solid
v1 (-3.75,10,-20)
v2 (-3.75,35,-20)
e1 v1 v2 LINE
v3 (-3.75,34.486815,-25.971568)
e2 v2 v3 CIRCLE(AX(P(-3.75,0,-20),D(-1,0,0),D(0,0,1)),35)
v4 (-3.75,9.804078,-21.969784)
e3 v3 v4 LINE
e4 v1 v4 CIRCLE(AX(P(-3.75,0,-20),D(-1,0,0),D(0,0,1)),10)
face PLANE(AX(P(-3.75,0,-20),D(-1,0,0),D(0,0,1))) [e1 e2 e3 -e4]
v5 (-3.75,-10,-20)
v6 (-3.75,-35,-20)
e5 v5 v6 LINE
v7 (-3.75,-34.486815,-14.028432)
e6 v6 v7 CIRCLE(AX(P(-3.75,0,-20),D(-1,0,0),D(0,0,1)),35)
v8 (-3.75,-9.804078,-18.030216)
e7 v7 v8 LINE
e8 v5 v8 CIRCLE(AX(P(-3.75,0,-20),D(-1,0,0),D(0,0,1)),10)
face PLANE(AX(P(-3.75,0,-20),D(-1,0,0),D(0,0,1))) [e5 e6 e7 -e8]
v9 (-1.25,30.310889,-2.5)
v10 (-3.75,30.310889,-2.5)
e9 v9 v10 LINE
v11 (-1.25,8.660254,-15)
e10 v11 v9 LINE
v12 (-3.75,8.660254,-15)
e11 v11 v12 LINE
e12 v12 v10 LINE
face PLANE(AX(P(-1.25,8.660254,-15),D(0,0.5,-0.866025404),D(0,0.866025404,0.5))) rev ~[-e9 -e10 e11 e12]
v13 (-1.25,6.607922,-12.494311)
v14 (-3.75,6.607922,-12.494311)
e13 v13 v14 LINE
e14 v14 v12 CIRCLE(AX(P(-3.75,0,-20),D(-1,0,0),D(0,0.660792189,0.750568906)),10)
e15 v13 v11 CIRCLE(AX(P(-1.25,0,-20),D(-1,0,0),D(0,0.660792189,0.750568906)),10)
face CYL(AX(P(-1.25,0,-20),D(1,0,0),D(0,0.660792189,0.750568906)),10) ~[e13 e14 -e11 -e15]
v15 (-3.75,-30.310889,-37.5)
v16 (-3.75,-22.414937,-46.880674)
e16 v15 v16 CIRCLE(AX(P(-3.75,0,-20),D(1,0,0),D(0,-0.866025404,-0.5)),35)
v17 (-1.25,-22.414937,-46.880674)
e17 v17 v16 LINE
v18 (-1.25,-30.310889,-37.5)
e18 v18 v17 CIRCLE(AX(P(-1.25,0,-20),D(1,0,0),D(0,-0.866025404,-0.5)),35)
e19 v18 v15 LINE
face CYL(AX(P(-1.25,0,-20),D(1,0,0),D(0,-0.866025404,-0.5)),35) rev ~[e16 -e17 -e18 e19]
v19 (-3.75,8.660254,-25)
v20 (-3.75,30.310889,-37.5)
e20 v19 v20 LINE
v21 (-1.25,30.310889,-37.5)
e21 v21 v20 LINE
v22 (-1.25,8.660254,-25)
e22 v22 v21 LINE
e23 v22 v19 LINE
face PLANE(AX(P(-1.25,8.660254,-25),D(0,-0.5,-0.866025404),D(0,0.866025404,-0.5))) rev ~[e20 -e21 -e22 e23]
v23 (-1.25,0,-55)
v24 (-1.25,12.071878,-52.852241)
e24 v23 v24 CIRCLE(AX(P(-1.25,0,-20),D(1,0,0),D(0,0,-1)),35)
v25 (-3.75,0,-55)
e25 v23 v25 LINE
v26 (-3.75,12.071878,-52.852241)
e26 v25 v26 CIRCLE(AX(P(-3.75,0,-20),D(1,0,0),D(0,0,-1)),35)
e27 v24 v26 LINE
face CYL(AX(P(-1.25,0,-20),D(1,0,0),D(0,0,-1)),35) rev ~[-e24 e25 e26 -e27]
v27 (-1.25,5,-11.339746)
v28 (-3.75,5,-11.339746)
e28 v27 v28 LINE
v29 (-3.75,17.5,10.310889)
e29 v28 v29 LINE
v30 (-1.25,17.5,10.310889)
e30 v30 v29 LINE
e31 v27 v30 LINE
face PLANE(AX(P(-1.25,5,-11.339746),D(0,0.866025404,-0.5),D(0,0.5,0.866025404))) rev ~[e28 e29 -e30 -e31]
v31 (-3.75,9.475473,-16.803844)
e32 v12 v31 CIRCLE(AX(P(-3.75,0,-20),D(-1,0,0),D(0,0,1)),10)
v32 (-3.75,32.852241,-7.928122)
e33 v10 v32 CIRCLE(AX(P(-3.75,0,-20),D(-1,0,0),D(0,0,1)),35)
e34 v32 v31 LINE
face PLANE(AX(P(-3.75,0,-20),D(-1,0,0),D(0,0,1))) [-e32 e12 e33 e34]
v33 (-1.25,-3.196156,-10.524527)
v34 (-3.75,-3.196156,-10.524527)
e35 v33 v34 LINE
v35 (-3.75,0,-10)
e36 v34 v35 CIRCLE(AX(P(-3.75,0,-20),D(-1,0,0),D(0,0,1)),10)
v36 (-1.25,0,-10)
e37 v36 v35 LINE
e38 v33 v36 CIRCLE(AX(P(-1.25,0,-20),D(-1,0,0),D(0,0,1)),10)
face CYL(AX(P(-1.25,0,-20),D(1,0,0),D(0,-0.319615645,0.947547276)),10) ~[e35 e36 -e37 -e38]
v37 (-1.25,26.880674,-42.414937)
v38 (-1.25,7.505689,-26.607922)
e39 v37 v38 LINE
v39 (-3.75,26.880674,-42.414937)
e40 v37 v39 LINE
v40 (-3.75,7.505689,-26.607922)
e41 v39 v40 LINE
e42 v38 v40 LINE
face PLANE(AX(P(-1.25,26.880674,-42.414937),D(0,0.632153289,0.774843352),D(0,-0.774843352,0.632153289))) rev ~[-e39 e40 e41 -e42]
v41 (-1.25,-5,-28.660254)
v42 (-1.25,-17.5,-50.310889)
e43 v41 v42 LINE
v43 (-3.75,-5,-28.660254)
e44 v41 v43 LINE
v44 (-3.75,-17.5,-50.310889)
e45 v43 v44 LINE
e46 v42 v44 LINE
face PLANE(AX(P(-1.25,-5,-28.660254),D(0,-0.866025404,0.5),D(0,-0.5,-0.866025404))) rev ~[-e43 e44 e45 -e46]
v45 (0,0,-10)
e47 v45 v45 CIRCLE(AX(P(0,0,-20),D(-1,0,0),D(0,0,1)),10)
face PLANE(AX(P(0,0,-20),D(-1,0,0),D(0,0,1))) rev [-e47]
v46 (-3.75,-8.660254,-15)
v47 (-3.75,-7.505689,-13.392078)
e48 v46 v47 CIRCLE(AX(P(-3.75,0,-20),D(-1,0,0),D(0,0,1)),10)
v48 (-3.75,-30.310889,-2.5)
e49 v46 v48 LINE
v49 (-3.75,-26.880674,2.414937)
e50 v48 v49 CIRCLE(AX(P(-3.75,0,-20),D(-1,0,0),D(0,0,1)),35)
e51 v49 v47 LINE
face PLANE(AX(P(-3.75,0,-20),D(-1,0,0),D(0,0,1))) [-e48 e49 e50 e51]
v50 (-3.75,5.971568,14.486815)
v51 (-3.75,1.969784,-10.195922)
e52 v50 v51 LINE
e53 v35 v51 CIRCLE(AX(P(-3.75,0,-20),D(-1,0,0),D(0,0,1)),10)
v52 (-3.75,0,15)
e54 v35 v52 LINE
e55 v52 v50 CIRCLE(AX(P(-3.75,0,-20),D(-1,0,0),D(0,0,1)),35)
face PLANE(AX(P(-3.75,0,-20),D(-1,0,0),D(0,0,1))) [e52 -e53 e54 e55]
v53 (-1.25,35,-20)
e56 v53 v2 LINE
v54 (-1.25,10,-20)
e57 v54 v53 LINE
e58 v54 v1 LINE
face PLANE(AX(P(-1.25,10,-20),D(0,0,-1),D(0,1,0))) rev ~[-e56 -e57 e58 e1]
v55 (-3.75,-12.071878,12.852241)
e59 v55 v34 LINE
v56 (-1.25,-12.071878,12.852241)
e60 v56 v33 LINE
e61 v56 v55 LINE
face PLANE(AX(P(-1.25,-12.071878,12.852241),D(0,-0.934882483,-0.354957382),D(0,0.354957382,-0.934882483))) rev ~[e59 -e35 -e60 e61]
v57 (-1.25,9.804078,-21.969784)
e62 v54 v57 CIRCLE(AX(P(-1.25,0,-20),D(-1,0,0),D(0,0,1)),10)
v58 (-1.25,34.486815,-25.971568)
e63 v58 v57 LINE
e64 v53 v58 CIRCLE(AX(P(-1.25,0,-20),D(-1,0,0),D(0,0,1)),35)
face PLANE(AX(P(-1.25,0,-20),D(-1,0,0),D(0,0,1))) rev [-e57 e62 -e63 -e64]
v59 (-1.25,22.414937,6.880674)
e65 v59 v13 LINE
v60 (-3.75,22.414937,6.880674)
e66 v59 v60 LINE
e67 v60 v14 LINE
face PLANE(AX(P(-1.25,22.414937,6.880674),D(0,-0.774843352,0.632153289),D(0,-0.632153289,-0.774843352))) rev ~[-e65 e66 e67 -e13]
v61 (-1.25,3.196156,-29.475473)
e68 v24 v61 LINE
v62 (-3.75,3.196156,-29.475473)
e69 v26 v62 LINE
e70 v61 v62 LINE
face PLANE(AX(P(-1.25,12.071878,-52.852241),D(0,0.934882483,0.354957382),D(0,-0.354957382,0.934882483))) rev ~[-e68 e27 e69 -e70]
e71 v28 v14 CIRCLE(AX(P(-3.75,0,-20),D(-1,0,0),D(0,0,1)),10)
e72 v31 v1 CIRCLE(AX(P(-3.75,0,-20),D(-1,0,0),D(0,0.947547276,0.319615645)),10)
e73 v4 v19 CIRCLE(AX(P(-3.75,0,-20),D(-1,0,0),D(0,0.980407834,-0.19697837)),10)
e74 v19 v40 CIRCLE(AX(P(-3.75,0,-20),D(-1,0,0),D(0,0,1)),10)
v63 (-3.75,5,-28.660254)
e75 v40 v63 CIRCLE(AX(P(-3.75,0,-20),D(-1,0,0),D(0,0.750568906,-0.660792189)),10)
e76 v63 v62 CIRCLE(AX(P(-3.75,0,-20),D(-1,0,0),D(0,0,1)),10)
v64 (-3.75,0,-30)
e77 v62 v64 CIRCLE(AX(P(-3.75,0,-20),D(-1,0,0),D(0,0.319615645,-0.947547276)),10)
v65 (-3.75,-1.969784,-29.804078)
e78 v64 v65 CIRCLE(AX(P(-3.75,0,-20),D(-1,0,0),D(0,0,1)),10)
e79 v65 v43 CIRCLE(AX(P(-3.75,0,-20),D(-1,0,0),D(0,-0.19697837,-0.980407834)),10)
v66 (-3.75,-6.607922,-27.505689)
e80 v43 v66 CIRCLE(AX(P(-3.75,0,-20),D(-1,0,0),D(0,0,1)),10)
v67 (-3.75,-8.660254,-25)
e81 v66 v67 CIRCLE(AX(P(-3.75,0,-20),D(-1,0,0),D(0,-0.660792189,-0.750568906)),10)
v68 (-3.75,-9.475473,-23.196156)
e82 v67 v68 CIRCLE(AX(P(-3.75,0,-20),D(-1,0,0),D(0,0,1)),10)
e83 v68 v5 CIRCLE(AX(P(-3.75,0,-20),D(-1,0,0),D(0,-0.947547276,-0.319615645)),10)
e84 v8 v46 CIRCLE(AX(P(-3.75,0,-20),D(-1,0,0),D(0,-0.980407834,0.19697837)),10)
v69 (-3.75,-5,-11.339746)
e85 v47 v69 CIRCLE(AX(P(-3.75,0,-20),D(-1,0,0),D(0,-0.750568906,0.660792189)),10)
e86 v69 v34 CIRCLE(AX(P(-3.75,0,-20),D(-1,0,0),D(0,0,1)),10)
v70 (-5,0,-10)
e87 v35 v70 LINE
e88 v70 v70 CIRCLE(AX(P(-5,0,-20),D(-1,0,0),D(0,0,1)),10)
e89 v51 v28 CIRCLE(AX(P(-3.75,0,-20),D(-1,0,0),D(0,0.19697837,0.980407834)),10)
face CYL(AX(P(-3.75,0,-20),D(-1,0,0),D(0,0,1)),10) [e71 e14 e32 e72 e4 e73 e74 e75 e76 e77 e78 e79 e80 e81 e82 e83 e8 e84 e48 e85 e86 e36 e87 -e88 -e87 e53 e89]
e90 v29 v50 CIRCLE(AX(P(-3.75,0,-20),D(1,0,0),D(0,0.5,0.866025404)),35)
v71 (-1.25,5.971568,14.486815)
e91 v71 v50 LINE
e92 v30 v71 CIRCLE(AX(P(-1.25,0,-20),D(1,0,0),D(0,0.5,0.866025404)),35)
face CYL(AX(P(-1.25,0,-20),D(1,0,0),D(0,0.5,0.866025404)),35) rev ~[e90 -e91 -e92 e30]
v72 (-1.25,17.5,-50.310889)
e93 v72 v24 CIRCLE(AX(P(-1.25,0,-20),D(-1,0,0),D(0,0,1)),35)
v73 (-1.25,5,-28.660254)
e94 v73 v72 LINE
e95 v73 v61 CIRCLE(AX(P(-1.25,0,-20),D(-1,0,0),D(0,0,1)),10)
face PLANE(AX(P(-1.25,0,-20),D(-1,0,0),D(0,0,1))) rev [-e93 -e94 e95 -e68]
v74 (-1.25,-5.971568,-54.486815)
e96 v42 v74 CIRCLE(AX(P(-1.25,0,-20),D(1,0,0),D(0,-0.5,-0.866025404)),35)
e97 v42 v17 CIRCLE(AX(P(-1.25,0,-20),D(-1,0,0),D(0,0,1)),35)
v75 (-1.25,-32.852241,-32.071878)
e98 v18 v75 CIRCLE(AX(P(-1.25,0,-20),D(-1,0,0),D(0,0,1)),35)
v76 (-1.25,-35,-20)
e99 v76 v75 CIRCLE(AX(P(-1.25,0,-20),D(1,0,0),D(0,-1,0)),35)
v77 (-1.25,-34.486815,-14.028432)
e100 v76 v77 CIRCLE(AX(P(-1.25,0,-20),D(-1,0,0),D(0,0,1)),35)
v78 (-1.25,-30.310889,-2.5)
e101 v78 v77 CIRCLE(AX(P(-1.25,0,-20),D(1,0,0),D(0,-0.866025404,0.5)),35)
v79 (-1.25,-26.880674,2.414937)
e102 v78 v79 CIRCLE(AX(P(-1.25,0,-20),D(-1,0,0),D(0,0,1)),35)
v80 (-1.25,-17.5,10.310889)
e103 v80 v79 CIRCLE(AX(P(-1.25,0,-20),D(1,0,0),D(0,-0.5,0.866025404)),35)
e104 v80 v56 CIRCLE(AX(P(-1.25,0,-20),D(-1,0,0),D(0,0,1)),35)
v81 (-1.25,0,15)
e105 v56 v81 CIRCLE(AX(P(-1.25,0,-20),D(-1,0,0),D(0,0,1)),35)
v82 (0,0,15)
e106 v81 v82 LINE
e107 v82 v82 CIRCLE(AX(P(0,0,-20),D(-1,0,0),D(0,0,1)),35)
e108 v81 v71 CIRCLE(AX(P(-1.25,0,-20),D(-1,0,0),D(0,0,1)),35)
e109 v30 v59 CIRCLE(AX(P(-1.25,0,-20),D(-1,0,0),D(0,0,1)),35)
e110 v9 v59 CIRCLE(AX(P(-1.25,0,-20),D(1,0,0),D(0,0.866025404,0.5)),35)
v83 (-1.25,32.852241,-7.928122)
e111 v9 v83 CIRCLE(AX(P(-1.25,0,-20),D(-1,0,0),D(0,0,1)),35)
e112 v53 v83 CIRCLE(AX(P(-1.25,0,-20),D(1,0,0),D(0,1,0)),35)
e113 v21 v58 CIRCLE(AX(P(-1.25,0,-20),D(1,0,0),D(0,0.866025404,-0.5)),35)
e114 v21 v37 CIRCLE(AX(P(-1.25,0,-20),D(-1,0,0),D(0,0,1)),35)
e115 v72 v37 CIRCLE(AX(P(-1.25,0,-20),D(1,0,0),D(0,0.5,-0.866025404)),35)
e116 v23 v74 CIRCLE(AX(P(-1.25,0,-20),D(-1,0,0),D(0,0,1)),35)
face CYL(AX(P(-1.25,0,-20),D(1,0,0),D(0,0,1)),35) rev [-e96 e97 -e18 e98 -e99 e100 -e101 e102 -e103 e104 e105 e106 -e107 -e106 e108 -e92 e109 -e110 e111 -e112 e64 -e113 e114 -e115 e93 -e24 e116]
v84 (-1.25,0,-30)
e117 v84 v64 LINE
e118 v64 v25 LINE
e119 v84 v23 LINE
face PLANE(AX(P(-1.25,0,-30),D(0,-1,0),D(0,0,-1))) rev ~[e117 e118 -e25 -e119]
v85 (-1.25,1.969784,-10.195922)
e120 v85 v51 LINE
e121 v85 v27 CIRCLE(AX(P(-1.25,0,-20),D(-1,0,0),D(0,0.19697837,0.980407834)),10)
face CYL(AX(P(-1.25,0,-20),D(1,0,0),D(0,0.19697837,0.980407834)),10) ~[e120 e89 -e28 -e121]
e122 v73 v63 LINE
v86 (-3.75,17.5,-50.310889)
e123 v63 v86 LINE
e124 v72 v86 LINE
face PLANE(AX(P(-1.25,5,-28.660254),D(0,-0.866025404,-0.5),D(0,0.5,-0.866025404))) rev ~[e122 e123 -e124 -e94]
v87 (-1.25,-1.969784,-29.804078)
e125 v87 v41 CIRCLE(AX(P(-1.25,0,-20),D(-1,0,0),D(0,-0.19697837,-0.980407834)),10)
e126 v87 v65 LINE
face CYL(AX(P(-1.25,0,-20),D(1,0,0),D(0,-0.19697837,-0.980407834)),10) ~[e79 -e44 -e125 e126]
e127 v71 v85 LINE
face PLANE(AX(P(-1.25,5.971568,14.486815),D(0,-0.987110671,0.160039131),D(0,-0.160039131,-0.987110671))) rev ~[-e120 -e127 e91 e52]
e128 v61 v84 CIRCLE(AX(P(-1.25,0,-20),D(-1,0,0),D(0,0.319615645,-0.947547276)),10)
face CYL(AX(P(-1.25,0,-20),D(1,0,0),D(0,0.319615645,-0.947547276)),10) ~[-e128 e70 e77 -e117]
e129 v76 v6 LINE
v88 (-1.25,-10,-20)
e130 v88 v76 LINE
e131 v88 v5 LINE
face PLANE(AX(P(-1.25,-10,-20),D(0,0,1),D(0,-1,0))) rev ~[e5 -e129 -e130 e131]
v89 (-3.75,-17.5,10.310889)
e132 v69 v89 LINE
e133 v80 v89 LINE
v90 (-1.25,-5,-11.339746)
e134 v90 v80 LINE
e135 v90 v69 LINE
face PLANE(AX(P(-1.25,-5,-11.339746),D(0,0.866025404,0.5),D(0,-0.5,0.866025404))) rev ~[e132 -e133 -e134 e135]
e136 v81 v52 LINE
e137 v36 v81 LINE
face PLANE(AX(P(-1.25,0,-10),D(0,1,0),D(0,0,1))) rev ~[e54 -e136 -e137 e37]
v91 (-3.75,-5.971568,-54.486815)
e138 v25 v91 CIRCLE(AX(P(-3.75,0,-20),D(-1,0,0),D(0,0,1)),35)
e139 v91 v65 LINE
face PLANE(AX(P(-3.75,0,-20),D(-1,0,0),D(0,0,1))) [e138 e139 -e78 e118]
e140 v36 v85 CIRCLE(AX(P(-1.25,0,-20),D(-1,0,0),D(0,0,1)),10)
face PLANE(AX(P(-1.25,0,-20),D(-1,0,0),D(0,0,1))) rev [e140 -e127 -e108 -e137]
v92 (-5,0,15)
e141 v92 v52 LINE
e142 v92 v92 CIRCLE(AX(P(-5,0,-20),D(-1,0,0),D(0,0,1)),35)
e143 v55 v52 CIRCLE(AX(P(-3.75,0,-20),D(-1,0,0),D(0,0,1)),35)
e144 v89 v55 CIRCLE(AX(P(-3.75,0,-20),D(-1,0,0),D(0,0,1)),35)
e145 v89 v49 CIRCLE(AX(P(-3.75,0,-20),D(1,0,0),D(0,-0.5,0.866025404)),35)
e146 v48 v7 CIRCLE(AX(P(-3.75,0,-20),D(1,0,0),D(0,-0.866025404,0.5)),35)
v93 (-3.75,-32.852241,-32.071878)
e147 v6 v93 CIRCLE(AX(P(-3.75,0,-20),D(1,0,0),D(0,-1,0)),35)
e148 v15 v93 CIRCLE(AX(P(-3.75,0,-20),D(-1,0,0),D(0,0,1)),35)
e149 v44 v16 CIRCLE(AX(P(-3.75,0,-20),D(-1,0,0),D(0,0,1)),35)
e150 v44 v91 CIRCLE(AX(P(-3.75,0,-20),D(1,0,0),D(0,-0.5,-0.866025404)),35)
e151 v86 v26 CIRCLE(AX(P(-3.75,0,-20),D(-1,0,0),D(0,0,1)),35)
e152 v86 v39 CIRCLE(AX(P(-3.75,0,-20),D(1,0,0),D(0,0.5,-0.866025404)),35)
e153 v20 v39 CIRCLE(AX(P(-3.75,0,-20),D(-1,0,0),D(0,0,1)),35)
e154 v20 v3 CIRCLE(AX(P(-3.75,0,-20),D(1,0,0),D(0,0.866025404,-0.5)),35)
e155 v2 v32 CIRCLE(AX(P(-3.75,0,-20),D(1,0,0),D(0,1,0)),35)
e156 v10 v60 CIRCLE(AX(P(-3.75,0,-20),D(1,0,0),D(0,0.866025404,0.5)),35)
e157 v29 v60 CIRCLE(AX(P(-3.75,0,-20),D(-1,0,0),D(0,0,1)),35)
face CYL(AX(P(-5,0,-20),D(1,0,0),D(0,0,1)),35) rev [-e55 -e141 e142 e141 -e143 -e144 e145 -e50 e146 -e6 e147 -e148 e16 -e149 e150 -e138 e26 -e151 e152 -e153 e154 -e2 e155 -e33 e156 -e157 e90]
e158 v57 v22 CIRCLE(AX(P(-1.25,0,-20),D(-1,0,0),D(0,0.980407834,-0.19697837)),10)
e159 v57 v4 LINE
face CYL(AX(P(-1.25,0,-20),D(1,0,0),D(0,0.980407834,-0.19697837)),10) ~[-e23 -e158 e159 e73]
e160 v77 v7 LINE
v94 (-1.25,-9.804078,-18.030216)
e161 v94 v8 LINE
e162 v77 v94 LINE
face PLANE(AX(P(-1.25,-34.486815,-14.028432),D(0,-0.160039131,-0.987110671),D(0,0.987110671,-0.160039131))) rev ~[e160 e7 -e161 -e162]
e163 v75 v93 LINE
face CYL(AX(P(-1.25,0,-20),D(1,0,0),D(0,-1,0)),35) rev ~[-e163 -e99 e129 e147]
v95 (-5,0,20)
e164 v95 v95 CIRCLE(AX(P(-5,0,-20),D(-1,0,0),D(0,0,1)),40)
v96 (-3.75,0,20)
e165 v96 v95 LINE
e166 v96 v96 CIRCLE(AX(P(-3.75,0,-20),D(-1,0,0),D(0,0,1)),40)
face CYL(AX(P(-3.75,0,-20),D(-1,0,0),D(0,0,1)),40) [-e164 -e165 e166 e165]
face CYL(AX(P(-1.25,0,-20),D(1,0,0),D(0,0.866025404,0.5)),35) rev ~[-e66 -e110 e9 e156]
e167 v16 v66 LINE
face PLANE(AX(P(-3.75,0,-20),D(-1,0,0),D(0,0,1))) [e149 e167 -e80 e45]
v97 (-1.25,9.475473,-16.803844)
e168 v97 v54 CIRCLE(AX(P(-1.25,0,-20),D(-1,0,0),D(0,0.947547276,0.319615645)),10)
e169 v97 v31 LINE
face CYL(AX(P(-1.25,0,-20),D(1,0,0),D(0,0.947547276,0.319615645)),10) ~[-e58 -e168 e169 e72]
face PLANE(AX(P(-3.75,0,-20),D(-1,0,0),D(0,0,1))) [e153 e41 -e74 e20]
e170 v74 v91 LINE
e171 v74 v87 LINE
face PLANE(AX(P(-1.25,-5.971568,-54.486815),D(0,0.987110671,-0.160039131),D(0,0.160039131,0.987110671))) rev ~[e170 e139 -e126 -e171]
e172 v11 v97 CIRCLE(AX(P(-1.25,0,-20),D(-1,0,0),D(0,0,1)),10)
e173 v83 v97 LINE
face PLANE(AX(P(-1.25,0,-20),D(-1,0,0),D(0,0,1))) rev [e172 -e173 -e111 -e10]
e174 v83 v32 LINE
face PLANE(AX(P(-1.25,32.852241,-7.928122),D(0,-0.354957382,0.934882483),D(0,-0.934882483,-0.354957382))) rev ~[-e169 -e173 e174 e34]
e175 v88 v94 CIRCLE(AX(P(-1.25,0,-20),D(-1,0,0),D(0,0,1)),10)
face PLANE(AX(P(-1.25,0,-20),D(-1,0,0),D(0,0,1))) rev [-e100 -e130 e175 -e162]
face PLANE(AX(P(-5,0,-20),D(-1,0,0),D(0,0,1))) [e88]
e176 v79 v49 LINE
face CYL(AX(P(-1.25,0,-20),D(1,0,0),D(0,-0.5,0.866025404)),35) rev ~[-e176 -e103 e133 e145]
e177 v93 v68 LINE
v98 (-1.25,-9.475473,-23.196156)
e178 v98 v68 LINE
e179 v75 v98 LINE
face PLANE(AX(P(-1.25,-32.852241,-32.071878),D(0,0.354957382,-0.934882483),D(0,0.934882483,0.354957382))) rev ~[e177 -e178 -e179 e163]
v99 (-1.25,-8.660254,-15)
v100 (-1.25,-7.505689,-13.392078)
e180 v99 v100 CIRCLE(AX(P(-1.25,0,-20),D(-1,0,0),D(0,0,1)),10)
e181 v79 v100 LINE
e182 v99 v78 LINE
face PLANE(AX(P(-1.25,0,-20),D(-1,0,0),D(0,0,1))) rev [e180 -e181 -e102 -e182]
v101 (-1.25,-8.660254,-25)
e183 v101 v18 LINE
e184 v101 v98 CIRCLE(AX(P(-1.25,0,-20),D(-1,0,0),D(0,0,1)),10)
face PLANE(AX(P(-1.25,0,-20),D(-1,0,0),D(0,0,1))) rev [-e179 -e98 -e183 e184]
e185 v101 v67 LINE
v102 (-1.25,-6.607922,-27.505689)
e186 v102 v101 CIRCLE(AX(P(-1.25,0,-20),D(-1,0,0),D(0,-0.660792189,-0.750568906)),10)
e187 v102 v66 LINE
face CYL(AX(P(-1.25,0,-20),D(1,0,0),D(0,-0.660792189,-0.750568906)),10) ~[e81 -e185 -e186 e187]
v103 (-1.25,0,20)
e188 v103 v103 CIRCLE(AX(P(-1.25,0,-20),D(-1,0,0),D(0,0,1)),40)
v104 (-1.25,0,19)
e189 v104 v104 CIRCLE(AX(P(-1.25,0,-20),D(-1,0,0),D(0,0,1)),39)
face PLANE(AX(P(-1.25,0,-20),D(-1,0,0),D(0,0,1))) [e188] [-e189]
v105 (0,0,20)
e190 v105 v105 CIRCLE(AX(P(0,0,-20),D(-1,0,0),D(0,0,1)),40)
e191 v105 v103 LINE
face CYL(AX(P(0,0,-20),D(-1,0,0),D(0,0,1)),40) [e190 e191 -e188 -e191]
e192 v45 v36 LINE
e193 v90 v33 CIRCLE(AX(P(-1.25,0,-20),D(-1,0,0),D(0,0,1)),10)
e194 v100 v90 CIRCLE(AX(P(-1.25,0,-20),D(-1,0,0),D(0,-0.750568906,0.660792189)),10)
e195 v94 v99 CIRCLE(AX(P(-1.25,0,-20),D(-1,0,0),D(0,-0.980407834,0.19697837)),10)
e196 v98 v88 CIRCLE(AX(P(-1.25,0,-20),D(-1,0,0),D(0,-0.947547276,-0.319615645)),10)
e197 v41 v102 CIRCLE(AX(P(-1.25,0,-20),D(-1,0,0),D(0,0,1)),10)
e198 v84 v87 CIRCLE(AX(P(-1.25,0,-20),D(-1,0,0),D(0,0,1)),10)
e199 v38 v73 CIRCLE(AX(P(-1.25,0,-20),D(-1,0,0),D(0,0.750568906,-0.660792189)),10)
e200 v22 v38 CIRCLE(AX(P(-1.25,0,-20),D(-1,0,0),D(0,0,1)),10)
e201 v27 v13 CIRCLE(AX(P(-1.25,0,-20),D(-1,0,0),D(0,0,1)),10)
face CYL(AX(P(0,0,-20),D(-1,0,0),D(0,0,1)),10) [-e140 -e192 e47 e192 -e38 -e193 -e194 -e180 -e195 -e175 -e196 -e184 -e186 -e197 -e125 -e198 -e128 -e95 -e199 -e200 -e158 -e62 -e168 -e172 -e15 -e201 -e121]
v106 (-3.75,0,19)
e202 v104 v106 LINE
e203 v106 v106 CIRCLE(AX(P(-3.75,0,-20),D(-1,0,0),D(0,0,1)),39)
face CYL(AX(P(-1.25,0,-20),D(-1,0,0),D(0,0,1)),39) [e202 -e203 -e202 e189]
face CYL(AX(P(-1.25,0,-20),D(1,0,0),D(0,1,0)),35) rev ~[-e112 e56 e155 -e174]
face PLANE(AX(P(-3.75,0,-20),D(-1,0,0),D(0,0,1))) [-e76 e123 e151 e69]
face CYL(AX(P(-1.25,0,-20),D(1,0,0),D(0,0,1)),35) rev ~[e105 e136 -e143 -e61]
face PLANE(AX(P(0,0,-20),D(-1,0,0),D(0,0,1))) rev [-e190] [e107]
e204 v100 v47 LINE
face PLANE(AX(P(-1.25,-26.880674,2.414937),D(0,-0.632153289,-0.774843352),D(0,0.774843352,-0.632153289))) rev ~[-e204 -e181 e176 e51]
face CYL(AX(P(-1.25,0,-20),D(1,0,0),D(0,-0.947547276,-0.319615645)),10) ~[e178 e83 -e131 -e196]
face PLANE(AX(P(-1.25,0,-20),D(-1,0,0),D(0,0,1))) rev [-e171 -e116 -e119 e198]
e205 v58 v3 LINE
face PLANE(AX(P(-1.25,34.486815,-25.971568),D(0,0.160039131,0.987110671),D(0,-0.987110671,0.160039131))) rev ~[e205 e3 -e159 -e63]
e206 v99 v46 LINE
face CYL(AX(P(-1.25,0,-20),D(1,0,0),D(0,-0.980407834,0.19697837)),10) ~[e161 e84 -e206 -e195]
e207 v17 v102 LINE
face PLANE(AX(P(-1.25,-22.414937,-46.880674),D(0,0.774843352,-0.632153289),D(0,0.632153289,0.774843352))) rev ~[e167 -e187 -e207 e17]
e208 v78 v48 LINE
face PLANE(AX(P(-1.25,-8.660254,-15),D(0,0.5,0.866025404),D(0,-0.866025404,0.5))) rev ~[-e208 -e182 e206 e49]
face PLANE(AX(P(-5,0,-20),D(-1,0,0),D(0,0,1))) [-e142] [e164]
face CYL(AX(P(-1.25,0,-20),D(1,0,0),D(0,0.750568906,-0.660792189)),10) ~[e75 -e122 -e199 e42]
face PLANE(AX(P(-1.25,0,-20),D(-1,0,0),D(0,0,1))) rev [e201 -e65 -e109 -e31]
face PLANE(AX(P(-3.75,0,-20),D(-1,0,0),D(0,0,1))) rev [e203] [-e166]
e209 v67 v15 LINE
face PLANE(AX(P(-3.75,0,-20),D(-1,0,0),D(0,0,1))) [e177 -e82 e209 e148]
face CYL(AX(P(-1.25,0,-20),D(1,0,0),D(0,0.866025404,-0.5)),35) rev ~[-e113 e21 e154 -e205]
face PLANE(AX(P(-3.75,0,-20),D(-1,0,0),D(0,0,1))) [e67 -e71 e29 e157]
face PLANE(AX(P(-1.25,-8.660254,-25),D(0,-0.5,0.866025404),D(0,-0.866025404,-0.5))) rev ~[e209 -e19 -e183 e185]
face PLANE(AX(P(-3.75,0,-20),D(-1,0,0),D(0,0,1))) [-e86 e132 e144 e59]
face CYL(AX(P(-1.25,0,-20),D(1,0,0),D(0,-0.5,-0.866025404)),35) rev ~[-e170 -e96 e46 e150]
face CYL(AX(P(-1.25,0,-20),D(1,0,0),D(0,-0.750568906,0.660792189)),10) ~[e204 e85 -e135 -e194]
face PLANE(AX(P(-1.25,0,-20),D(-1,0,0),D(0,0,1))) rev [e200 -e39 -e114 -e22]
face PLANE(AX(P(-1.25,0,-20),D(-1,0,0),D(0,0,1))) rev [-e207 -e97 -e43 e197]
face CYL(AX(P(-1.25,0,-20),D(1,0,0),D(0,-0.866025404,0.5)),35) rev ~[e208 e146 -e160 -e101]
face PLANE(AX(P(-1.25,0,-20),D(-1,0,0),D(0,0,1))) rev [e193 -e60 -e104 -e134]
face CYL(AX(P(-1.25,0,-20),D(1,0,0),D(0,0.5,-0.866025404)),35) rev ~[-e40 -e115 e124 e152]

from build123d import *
from build123d import SkipClean  # not in build123d's __all__

# Parameters (mm, degrees)
F3_DEPTH        = 2.5
F3_COPIES_COUNT = 12


# Not quite as in the source:
# - after a boolean that leaves OpenCascade's solid faulty, fix() repairs it
# - a pattern or mirror of a feature is missing from the dataset's text; its kind, count and spacing are read off the source's solid


with BuildPart() as f1:
    # F0 (on Front) → F1 (revolve)
    with BuildSketch(Plane.XZ):
        Polygon((-5, -20), (0, -20), (0, -10), (-1.25, -10), (-1.25, 15), (0, 15), (0, 20), (-1.25, 20), (-1.25, 19), (-3.75, 19), (-3.75, 20), (-5, 20), (-5, 15), (-3.75, 15), (-3.75, -10), (-5, -10), align=None)
    revolve(axis=Axis((-2.5, 0, -20), (-1, 0, 0)))

    # F2 (on face) → F3 (cut, through all)
    with BuildSketch(Plane.YZ.offset(-1.25)):
        with BuildLine():
            Line((0, -10), (0, 15))
            ThreePointArc((0, 15), (-6.1307239653, 14.4588772838), (-12.0718779875, 12.8522413521))
            Line((-12.0718779875, 12.8522413521), (-3.1961564517, -10.5245272447))
            ThreePointArc((-3.1961564517, -10.5245272447), (-1.6194555331, -10.1320030515), (0, -10))
        make_face()
    with SkipClean():  # cleaning this boolean's faces spoils the solid; the shape is the same uncleaned
        f3 = extrude(amount=-F3_DEPTH, mode=Mode.SUBTRACT)

    # F3_copies: F3 ×12 about axis
    f3_copies_axis = Axis((0, 0, -20), (1, 0, 0))
    for i in range(1, F3_COPIES_COUNT):
        add(f3.rotate(f3_copies_axis, i * 360 / F3_COPIES_COUNT), clean=False, mode=Mode.SUBTRACT)

    add(f1.part.fix(), mode=Mode.REPLACE)


solid = f1.part
